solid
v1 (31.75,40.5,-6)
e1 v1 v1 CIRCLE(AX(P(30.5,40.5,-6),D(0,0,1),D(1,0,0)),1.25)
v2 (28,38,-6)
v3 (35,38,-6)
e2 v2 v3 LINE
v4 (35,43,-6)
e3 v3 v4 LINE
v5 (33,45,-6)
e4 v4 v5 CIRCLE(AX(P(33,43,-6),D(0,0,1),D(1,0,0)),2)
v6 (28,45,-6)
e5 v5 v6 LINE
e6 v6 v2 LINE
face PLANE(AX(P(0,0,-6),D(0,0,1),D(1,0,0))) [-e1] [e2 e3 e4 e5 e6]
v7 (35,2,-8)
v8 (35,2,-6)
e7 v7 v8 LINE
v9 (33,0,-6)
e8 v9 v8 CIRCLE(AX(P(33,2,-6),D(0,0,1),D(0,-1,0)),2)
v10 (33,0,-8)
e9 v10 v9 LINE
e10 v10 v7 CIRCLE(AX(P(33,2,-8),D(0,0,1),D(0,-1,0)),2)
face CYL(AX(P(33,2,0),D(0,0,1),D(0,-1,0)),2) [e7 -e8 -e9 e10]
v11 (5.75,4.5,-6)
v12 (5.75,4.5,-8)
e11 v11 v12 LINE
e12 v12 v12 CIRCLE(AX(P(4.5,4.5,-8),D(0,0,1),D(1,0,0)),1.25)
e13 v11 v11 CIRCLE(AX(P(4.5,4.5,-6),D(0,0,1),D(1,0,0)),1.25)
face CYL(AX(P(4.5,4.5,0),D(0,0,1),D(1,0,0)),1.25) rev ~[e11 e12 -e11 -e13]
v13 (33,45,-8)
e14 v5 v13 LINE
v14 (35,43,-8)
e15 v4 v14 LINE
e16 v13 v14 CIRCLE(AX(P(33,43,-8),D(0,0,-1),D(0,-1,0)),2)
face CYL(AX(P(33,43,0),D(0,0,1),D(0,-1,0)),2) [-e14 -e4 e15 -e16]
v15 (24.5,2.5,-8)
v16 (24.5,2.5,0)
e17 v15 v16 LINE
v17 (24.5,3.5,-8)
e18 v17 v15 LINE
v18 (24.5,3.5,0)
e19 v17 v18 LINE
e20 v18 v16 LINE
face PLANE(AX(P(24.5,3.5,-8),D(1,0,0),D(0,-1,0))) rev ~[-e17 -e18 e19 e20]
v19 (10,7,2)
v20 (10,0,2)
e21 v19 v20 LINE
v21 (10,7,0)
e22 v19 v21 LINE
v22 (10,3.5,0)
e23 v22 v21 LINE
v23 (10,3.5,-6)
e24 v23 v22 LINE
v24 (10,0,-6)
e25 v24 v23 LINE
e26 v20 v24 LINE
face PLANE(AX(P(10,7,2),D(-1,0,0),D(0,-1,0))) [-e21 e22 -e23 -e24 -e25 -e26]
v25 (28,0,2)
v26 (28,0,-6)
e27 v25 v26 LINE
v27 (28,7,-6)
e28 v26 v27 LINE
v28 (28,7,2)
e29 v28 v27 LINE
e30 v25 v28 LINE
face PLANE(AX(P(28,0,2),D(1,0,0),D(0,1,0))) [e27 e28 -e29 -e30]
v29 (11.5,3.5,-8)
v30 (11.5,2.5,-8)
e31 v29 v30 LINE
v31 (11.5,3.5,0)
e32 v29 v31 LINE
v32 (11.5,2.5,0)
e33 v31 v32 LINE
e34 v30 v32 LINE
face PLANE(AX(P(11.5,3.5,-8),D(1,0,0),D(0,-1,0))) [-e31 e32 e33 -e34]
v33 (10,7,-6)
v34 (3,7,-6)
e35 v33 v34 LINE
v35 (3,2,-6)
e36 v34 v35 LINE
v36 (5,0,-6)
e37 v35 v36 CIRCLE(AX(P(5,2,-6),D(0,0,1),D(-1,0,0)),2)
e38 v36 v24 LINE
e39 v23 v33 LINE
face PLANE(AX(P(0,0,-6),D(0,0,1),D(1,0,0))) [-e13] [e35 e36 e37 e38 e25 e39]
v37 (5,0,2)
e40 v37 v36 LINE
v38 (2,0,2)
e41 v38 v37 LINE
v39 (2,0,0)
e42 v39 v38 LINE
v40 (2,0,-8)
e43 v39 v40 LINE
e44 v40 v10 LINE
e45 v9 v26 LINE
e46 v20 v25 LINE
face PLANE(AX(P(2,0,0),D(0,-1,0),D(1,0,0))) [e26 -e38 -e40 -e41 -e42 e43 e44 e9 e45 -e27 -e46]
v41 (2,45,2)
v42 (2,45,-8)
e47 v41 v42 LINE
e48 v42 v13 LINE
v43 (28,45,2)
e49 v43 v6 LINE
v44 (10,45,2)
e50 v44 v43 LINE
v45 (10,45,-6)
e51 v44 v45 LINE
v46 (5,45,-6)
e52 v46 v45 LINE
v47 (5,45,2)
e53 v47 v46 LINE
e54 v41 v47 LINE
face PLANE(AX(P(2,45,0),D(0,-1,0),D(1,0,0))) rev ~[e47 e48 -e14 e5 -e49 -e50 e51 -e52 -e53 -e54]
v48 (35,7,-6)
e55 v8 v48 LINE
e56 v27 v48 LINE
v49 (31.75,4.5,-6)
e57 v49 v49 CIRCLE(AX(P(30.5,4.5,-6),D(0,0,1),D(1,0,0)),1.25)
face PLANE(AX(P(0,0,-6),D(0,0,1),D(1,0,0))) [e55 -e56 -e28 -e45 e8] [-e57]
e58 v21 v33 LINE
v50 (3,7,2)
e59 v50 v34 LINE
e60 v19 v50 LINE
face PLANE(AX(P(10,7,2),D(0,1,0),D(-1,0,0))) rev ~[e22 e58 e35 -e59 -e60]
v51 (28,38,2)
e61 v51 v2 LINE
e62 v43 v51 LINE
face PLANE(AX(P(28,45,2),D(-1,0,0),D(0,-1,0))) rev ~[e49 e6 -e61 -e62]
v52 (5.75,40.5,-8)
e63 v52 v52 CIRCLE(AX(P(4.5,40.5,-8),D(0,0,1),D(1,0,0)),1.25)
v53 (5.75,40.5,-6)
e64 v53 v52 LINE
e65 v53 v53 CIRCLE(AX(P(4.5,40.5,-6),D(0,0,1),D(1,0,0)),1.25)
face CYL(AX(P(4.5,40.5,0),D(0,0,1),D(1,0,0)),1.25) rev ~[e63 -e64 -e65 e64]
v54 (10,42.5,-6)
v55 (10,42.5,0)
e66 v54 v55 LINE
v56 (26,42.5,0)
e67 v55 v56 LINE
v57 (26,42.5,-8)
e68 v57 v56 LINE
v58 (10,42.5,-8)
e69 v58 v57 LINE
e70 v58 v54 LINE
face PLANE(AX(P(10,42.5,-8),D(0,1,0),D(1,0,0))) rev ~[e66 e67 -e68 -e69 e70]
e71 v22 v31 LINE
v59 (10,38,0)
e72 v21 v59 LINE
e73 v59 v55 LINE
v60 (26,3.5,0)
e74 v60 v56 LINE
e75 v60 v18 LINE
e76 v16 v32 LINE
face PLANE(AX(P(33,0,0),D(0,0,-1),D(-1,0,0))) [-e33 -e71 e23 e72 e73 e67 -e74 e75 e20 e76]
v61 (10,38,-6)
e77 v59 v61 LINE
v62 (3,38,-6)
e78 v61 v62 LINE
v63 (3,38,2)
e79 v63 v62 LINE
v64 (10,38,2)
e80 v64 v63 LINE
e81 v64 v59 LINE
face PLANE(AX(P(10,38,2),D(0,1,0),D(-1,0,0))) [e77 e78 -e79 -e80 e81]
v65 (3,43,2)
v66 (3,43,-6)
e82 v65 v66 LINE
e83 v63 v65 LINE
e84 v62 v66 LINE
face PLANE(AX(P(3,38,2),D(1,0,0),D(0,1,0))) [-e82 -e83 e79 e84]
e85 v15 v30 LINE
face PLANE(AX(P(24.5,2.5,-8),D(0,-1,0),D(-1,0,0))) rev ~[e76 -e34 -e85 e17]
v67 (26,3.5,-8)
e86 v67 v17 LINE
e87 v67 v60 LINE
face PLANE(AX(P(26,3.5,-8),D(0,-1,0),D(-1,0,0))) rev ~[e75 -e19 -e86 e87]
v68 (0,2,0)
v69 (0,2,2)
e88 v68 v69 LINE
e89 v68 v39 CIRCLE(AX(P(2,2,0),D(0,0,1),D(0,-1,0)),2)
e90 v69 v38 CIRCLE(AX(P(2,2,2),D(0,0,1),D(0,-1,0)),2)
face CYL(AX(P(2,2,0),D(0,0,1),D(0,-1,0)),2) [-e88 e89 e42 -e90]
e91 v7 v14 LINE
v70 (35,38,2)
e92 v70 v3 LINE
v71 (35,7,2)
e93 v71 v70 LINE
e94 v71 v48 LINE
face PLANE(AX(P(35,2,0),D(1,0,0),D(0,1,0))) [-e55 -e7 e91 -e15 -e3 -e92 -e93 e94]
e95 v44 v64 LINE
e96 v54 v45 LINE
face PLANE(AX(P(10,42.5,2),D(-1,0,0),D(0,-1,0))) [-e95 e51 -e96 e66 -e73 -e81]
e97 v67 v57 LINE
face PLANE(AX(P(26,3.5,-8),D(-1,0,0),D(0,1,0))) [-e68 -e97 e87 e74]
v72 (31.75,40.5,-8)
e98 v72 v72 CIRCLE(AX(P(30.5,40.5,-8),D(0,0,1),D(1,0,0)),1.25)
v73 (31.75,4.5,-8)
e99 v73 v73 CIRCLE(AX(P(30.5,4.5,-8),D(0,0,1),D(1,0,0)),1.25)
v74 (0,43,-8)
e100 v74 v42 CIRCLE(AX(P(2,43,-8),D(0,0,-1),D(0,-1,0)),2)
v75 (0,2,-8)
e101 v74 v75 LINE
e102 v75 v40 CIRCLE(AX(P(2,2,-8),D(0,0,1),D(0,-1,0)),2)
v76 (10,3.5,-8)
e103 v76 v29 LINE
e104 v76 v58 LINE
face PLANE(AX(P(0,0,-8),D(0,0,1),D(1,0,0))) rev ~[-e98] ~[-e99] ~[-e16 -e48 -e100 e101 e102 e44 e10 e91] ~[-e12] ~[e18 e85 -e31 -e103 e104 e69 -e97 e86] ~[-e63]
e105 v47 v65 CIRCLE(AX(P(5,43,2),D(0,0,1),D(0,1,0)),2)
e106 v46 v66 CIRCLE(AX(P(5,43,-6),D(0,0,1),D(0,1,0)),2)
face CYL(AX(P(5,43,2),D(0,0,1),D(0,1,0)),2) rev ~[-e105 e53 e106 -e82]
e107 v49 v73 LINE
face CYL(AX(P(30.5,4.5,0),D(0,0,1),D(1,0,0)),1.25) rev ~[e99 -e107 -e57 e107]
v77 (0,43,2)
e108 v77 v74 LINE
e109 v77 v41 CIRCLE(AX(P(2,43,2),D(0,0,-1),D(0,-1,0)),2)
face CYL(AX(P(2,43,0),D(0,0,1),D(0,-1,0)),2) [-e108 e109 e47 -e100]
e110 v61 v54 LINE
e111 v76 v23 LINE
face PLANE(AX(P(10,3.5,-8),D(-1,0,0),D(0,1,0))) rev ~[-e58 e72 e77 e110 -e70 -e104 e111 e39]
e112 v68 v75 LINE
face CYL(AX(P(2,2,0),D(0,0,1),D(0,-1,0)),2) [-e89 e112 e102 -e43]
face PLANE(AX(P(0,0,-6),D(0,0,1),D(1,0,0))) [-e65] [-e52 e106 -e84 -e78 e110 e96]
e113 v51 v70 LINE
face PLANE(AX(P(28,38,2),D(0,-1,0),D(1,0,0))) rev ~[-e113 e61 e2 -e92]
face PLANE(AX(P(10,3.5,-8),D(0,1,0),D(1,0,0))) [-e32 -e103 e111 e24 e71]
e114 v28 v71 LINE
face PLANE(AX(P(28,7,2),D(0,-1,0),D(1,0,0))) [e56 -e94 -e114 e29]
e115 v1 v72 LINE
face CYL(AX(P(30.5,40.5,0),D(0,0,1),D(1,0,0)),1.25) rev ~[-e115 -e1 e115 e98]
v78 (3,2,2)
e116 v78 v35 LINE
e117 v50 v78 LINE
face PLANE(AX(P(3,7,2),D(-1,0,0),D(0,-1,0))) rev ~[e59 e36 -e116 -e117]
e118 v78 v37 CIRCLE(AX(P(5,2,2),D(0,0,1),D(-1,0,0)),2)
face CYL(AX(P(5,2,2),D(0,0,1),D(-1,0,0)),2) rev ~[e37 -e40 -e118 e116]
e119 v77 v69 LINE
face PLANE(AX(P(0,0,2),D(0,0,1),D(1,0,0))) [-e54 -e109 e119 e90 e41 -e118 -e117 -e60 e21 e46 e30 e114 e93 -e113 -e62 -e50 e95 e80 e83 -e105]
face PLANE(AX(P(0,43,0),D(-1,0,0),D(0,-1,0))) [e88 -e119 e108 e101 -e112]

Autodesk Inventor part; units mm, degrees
ref_plane "YZ Plane" through (0, 0, 0) normal (1, 0, 0) x (0, 1, 0)
ref_plane "XZ Plane" through (0, 0, 0) normal (0, 1, 0) x (-1, 0, 0)
ref_plane "XY Plane" through (0, 0, 0) normal (0, 0, 1) x (1, 0, 0)
sketch "Sketch1" plane through (0, 0, 0) normal (0, 0, 1) x (1, 0, 0)
  line L0 (0, 0) -> (35, 0)
  line L1 (35, 0) -> (35, 45)
  line L2 (0, 45) -> (35, 45) construction
  circle A0 centre (4.5, 40.5) radius 1.25
  line L3 (17.5, 50) -> (17.5, 0) construction
  circle A1 centre (30.5, 40.5) radius 1.25
  line L4 (0, 45) -> (0, 0)
  line L5 (0, 22.5) -> (35, 22.5) construction
  circle A2 centre (4.5, 4.5) radius 1.25
  circle A3 centre (30.5, 4.5) radius 1.25
  line L6 (8.5, 3.5) -> (26.5, 3.5)
  line L7 (26.5, 3.5) -> (26.5, 43.5)
  line L8 (26.5, 43.5) -> (8.5, 43.5)
  line L9 (8.5, 43.5) -> (8.5, 3.5)
  line L10 (8.5, 3.5) -> (10, 3.5)
  line L11 (8.5, 4.5) -> (8.5, 3.5)
  line L12 (9.5, 4.5) -> (9.5, 43.5)
  line L13 (8.5, 4.5) -> (11, 4.5)
  line L14 (11, 4.5) -> (11, 3.5)
  line L15 (25.5, 4.5) -> (25.5, 43.5)
  line L16 (26.5, 4.5) -> (24, 4.5)
  line L17 (24, 4.5) -> (24, 3.5)
  line L18 (0, 45) -> (35, 45)
  line L19 (0, 45) -> (0, 0)
  point P0 (11, 4)
  point P1 (24, 4)
  point P2 (9.5, 4.5)
  point P3 (25.5, 4.5)
  point P4 (24, 3.5)
  dimension "d5" = 2.5
  dimension "d6" = 4.5
  dimension "d8" = 2.5
  dimension "d9" = 18
  dimension "d10" = 40
  dimension "d11" = 3.5
  dimension "d19" = 1
  dimension "d26" = 8
  dimension "d27" = 2.5
  dimension "d28" = 35
  dimension "d29" = 1.5
  dimension "d30" = 26
  dimension "d31" = 9
  dimension "d54" = 45
extrude "Extrusion1" add sketch "Sketch1" along normal blind 2 contours L4 L18 L1 L0 | L9 L13 L14 L6 | L9 L8 L12 L13 | L14 L13 L12 L8 L15 L16 L17 L6 | L17 L16 L7 L6 | L8 L7 L16 L15
extrude "Extrusion2" add sketch "Sketch1" against normal blind 8 contours L9 L13 L14 L6 | L9 L8 L12 L13 | L17 L16 L7 L6 | L8 L7 L16 L15
fillet "Fillet1" radius 2 2 edges at (26.5, 3.5, -4) (8.5, 3.5, -4)
fillet "Fillet2" radius 2 2 edges at (25.5, 43.5, -4) (9.5, 43.5, -4)
fillet "Fillet3" radius 2 4 edges at (35, 45, 1) (0, 45, 1) (0, 0, 1) (35, 0, 1)
thicken "Thicken1" operation add thickness 8 both sides no extend neighbours no toward (0, 0, -1) faces at (19.6667, 29.3453, 0)
sketch "Sketch3" plane through (33, 0, -8) normal (0, 0, -1) x (-1, 0, 0)
  line L0 (15, 49) -> (15, -1) construction
  line L1 (-2.5, 20) -> (32.5, 20) construction
  line L2 (6, 2.5) -> (24, 2.5)
  line L3 (24, 2.5) -> (24, 42.5)
  line L4 (24, 42.5) -> (6, 42.5)
  line L5 (6, 42.5) -> (6, 2.5)
  line L6 (6, 2.5) -> (7.5, 2.5)
  line L7 (6, 3.5) -> (6, 2.5)
  line L8 (7, 3.5) -> (7, 42.5)
  line L9 (6, 3.5) -> (8.5, 3.5)
  line L10 (8.5, 3.5) -> (8.5, 2.5)
  line L11 (23, 3.5) -> (23, 42.5)
  line L12 (24, 3.5) -> (21.5, 3.5)
  line L13 (21.5, 3.5) -> (21.5, 2.5)
  line L14 (31, 0) -> (0, 0) projected
  point P0 (33, 0)
  point P1 (8.5, 3)
  point P2 (21.5, 3)
  point P3 (7, 3.5)
  dimension "d36" = 18
  dimension "d37" = 40
  dimension "d38" = 1
  dimension "d39" = 8
  dimension "d40" = 2.5
  dimension "d41" = 9
  dimension "d42" = 2.5
  dimension "d43" = 7
  dimension "d44" = 8.5
extrude "Extrusion3" cut sketch "Sketch3" against normal blind 8 contours L10 L9 L8 L4 L11 L12 L13 L2
sketch "Sketch4" plane through (0, 0, 2) normal (0, 0, 1) x (1, 0, 0)
  line L0 (10, 42.5) -> (10, 3.5) projected
  line L1 (5, 45) -> (10, 45)
  line L2 (10, 45) -> (10, 38)
  line L3 (10, 38) -> (3, 38)
  line L4 (3, 38) -> (3, 43)
  line L5 (33, 45) -> (28, 45)
  line L6 (28, 45) -> (28, 38)
  line L7 (28, 38) -> (35, 38)
  line L8 (35, 38) -> (35, 43)
  arc A0 (5, 45) -> (3, 43) centre (5, 43) ccw
  arc A1 (35, 43) -> (33, 45) centre (33, 43) ccw
  line L9 (0, 0) -> (0, 45)
  line L10 (35, 2) -> (35, 43) projected
  line L11 (35, 22.5) -> (39, 22.5)
  line L12 (10, 2.5) -> (10, 41.5)
  line L13 (5, 0) -> (10, 0)
  line L14 (10, 0) -> (10, 7)
  line L15 (10, 7) -> (3, 7)
  line L16 (3, 7) -> (3, 2)
  line L17 (33, 0) -> (28, 0)
  line L18 (28, 0) -> (28, 7)
  line L19 (28, 7) -> (35, 7)
  line L20 (35, 7) -> (35, 2)
  arc A2 (3, 2) -> (5, 0) centre (5, 2) ccw
  arc A3 (33, 0) -> (35, 2) centre (33, 2) ccw
  line L21 (0, 45) -> (0, 0)
  line L22 (35, 43) -> (35, 2)
  point P0 (35, 45)
  point P1 (35, 0)
  point P2 (35, 7)
  point P3 (0, 10)
  point P4 (0, 2)
  dimension "d47" = 7
  dimension "d48" = 2
  dimension "d49" = 2
extrude "Extrusion4" cut sketch "Sketch4" against normal blind 8
sketch "Sketch6" plane through (11.5, 2.5, -8) normal (0, 1, 0) x (1, 0, 0)
  line L0 (23.5, -10) -> (16.5, -10) projected
  line L1 (14.5, 0) -> (-1.5, 0) projected
  line L2 (16.5, -10) -> (-1.5, -10)
  line L3 (-1.5, -10) -> (-1.5, 0)
  line L4 (-1.5, 0) -> (16.5, 0)
  line L5 (16.5, 0) -> (16.5, -10)
  point P0 (-11.5, -8)
  point P1 (13.5, 0)
extrude "Extrusion5" [suppressed]
properties part number "Sensor Housing"
